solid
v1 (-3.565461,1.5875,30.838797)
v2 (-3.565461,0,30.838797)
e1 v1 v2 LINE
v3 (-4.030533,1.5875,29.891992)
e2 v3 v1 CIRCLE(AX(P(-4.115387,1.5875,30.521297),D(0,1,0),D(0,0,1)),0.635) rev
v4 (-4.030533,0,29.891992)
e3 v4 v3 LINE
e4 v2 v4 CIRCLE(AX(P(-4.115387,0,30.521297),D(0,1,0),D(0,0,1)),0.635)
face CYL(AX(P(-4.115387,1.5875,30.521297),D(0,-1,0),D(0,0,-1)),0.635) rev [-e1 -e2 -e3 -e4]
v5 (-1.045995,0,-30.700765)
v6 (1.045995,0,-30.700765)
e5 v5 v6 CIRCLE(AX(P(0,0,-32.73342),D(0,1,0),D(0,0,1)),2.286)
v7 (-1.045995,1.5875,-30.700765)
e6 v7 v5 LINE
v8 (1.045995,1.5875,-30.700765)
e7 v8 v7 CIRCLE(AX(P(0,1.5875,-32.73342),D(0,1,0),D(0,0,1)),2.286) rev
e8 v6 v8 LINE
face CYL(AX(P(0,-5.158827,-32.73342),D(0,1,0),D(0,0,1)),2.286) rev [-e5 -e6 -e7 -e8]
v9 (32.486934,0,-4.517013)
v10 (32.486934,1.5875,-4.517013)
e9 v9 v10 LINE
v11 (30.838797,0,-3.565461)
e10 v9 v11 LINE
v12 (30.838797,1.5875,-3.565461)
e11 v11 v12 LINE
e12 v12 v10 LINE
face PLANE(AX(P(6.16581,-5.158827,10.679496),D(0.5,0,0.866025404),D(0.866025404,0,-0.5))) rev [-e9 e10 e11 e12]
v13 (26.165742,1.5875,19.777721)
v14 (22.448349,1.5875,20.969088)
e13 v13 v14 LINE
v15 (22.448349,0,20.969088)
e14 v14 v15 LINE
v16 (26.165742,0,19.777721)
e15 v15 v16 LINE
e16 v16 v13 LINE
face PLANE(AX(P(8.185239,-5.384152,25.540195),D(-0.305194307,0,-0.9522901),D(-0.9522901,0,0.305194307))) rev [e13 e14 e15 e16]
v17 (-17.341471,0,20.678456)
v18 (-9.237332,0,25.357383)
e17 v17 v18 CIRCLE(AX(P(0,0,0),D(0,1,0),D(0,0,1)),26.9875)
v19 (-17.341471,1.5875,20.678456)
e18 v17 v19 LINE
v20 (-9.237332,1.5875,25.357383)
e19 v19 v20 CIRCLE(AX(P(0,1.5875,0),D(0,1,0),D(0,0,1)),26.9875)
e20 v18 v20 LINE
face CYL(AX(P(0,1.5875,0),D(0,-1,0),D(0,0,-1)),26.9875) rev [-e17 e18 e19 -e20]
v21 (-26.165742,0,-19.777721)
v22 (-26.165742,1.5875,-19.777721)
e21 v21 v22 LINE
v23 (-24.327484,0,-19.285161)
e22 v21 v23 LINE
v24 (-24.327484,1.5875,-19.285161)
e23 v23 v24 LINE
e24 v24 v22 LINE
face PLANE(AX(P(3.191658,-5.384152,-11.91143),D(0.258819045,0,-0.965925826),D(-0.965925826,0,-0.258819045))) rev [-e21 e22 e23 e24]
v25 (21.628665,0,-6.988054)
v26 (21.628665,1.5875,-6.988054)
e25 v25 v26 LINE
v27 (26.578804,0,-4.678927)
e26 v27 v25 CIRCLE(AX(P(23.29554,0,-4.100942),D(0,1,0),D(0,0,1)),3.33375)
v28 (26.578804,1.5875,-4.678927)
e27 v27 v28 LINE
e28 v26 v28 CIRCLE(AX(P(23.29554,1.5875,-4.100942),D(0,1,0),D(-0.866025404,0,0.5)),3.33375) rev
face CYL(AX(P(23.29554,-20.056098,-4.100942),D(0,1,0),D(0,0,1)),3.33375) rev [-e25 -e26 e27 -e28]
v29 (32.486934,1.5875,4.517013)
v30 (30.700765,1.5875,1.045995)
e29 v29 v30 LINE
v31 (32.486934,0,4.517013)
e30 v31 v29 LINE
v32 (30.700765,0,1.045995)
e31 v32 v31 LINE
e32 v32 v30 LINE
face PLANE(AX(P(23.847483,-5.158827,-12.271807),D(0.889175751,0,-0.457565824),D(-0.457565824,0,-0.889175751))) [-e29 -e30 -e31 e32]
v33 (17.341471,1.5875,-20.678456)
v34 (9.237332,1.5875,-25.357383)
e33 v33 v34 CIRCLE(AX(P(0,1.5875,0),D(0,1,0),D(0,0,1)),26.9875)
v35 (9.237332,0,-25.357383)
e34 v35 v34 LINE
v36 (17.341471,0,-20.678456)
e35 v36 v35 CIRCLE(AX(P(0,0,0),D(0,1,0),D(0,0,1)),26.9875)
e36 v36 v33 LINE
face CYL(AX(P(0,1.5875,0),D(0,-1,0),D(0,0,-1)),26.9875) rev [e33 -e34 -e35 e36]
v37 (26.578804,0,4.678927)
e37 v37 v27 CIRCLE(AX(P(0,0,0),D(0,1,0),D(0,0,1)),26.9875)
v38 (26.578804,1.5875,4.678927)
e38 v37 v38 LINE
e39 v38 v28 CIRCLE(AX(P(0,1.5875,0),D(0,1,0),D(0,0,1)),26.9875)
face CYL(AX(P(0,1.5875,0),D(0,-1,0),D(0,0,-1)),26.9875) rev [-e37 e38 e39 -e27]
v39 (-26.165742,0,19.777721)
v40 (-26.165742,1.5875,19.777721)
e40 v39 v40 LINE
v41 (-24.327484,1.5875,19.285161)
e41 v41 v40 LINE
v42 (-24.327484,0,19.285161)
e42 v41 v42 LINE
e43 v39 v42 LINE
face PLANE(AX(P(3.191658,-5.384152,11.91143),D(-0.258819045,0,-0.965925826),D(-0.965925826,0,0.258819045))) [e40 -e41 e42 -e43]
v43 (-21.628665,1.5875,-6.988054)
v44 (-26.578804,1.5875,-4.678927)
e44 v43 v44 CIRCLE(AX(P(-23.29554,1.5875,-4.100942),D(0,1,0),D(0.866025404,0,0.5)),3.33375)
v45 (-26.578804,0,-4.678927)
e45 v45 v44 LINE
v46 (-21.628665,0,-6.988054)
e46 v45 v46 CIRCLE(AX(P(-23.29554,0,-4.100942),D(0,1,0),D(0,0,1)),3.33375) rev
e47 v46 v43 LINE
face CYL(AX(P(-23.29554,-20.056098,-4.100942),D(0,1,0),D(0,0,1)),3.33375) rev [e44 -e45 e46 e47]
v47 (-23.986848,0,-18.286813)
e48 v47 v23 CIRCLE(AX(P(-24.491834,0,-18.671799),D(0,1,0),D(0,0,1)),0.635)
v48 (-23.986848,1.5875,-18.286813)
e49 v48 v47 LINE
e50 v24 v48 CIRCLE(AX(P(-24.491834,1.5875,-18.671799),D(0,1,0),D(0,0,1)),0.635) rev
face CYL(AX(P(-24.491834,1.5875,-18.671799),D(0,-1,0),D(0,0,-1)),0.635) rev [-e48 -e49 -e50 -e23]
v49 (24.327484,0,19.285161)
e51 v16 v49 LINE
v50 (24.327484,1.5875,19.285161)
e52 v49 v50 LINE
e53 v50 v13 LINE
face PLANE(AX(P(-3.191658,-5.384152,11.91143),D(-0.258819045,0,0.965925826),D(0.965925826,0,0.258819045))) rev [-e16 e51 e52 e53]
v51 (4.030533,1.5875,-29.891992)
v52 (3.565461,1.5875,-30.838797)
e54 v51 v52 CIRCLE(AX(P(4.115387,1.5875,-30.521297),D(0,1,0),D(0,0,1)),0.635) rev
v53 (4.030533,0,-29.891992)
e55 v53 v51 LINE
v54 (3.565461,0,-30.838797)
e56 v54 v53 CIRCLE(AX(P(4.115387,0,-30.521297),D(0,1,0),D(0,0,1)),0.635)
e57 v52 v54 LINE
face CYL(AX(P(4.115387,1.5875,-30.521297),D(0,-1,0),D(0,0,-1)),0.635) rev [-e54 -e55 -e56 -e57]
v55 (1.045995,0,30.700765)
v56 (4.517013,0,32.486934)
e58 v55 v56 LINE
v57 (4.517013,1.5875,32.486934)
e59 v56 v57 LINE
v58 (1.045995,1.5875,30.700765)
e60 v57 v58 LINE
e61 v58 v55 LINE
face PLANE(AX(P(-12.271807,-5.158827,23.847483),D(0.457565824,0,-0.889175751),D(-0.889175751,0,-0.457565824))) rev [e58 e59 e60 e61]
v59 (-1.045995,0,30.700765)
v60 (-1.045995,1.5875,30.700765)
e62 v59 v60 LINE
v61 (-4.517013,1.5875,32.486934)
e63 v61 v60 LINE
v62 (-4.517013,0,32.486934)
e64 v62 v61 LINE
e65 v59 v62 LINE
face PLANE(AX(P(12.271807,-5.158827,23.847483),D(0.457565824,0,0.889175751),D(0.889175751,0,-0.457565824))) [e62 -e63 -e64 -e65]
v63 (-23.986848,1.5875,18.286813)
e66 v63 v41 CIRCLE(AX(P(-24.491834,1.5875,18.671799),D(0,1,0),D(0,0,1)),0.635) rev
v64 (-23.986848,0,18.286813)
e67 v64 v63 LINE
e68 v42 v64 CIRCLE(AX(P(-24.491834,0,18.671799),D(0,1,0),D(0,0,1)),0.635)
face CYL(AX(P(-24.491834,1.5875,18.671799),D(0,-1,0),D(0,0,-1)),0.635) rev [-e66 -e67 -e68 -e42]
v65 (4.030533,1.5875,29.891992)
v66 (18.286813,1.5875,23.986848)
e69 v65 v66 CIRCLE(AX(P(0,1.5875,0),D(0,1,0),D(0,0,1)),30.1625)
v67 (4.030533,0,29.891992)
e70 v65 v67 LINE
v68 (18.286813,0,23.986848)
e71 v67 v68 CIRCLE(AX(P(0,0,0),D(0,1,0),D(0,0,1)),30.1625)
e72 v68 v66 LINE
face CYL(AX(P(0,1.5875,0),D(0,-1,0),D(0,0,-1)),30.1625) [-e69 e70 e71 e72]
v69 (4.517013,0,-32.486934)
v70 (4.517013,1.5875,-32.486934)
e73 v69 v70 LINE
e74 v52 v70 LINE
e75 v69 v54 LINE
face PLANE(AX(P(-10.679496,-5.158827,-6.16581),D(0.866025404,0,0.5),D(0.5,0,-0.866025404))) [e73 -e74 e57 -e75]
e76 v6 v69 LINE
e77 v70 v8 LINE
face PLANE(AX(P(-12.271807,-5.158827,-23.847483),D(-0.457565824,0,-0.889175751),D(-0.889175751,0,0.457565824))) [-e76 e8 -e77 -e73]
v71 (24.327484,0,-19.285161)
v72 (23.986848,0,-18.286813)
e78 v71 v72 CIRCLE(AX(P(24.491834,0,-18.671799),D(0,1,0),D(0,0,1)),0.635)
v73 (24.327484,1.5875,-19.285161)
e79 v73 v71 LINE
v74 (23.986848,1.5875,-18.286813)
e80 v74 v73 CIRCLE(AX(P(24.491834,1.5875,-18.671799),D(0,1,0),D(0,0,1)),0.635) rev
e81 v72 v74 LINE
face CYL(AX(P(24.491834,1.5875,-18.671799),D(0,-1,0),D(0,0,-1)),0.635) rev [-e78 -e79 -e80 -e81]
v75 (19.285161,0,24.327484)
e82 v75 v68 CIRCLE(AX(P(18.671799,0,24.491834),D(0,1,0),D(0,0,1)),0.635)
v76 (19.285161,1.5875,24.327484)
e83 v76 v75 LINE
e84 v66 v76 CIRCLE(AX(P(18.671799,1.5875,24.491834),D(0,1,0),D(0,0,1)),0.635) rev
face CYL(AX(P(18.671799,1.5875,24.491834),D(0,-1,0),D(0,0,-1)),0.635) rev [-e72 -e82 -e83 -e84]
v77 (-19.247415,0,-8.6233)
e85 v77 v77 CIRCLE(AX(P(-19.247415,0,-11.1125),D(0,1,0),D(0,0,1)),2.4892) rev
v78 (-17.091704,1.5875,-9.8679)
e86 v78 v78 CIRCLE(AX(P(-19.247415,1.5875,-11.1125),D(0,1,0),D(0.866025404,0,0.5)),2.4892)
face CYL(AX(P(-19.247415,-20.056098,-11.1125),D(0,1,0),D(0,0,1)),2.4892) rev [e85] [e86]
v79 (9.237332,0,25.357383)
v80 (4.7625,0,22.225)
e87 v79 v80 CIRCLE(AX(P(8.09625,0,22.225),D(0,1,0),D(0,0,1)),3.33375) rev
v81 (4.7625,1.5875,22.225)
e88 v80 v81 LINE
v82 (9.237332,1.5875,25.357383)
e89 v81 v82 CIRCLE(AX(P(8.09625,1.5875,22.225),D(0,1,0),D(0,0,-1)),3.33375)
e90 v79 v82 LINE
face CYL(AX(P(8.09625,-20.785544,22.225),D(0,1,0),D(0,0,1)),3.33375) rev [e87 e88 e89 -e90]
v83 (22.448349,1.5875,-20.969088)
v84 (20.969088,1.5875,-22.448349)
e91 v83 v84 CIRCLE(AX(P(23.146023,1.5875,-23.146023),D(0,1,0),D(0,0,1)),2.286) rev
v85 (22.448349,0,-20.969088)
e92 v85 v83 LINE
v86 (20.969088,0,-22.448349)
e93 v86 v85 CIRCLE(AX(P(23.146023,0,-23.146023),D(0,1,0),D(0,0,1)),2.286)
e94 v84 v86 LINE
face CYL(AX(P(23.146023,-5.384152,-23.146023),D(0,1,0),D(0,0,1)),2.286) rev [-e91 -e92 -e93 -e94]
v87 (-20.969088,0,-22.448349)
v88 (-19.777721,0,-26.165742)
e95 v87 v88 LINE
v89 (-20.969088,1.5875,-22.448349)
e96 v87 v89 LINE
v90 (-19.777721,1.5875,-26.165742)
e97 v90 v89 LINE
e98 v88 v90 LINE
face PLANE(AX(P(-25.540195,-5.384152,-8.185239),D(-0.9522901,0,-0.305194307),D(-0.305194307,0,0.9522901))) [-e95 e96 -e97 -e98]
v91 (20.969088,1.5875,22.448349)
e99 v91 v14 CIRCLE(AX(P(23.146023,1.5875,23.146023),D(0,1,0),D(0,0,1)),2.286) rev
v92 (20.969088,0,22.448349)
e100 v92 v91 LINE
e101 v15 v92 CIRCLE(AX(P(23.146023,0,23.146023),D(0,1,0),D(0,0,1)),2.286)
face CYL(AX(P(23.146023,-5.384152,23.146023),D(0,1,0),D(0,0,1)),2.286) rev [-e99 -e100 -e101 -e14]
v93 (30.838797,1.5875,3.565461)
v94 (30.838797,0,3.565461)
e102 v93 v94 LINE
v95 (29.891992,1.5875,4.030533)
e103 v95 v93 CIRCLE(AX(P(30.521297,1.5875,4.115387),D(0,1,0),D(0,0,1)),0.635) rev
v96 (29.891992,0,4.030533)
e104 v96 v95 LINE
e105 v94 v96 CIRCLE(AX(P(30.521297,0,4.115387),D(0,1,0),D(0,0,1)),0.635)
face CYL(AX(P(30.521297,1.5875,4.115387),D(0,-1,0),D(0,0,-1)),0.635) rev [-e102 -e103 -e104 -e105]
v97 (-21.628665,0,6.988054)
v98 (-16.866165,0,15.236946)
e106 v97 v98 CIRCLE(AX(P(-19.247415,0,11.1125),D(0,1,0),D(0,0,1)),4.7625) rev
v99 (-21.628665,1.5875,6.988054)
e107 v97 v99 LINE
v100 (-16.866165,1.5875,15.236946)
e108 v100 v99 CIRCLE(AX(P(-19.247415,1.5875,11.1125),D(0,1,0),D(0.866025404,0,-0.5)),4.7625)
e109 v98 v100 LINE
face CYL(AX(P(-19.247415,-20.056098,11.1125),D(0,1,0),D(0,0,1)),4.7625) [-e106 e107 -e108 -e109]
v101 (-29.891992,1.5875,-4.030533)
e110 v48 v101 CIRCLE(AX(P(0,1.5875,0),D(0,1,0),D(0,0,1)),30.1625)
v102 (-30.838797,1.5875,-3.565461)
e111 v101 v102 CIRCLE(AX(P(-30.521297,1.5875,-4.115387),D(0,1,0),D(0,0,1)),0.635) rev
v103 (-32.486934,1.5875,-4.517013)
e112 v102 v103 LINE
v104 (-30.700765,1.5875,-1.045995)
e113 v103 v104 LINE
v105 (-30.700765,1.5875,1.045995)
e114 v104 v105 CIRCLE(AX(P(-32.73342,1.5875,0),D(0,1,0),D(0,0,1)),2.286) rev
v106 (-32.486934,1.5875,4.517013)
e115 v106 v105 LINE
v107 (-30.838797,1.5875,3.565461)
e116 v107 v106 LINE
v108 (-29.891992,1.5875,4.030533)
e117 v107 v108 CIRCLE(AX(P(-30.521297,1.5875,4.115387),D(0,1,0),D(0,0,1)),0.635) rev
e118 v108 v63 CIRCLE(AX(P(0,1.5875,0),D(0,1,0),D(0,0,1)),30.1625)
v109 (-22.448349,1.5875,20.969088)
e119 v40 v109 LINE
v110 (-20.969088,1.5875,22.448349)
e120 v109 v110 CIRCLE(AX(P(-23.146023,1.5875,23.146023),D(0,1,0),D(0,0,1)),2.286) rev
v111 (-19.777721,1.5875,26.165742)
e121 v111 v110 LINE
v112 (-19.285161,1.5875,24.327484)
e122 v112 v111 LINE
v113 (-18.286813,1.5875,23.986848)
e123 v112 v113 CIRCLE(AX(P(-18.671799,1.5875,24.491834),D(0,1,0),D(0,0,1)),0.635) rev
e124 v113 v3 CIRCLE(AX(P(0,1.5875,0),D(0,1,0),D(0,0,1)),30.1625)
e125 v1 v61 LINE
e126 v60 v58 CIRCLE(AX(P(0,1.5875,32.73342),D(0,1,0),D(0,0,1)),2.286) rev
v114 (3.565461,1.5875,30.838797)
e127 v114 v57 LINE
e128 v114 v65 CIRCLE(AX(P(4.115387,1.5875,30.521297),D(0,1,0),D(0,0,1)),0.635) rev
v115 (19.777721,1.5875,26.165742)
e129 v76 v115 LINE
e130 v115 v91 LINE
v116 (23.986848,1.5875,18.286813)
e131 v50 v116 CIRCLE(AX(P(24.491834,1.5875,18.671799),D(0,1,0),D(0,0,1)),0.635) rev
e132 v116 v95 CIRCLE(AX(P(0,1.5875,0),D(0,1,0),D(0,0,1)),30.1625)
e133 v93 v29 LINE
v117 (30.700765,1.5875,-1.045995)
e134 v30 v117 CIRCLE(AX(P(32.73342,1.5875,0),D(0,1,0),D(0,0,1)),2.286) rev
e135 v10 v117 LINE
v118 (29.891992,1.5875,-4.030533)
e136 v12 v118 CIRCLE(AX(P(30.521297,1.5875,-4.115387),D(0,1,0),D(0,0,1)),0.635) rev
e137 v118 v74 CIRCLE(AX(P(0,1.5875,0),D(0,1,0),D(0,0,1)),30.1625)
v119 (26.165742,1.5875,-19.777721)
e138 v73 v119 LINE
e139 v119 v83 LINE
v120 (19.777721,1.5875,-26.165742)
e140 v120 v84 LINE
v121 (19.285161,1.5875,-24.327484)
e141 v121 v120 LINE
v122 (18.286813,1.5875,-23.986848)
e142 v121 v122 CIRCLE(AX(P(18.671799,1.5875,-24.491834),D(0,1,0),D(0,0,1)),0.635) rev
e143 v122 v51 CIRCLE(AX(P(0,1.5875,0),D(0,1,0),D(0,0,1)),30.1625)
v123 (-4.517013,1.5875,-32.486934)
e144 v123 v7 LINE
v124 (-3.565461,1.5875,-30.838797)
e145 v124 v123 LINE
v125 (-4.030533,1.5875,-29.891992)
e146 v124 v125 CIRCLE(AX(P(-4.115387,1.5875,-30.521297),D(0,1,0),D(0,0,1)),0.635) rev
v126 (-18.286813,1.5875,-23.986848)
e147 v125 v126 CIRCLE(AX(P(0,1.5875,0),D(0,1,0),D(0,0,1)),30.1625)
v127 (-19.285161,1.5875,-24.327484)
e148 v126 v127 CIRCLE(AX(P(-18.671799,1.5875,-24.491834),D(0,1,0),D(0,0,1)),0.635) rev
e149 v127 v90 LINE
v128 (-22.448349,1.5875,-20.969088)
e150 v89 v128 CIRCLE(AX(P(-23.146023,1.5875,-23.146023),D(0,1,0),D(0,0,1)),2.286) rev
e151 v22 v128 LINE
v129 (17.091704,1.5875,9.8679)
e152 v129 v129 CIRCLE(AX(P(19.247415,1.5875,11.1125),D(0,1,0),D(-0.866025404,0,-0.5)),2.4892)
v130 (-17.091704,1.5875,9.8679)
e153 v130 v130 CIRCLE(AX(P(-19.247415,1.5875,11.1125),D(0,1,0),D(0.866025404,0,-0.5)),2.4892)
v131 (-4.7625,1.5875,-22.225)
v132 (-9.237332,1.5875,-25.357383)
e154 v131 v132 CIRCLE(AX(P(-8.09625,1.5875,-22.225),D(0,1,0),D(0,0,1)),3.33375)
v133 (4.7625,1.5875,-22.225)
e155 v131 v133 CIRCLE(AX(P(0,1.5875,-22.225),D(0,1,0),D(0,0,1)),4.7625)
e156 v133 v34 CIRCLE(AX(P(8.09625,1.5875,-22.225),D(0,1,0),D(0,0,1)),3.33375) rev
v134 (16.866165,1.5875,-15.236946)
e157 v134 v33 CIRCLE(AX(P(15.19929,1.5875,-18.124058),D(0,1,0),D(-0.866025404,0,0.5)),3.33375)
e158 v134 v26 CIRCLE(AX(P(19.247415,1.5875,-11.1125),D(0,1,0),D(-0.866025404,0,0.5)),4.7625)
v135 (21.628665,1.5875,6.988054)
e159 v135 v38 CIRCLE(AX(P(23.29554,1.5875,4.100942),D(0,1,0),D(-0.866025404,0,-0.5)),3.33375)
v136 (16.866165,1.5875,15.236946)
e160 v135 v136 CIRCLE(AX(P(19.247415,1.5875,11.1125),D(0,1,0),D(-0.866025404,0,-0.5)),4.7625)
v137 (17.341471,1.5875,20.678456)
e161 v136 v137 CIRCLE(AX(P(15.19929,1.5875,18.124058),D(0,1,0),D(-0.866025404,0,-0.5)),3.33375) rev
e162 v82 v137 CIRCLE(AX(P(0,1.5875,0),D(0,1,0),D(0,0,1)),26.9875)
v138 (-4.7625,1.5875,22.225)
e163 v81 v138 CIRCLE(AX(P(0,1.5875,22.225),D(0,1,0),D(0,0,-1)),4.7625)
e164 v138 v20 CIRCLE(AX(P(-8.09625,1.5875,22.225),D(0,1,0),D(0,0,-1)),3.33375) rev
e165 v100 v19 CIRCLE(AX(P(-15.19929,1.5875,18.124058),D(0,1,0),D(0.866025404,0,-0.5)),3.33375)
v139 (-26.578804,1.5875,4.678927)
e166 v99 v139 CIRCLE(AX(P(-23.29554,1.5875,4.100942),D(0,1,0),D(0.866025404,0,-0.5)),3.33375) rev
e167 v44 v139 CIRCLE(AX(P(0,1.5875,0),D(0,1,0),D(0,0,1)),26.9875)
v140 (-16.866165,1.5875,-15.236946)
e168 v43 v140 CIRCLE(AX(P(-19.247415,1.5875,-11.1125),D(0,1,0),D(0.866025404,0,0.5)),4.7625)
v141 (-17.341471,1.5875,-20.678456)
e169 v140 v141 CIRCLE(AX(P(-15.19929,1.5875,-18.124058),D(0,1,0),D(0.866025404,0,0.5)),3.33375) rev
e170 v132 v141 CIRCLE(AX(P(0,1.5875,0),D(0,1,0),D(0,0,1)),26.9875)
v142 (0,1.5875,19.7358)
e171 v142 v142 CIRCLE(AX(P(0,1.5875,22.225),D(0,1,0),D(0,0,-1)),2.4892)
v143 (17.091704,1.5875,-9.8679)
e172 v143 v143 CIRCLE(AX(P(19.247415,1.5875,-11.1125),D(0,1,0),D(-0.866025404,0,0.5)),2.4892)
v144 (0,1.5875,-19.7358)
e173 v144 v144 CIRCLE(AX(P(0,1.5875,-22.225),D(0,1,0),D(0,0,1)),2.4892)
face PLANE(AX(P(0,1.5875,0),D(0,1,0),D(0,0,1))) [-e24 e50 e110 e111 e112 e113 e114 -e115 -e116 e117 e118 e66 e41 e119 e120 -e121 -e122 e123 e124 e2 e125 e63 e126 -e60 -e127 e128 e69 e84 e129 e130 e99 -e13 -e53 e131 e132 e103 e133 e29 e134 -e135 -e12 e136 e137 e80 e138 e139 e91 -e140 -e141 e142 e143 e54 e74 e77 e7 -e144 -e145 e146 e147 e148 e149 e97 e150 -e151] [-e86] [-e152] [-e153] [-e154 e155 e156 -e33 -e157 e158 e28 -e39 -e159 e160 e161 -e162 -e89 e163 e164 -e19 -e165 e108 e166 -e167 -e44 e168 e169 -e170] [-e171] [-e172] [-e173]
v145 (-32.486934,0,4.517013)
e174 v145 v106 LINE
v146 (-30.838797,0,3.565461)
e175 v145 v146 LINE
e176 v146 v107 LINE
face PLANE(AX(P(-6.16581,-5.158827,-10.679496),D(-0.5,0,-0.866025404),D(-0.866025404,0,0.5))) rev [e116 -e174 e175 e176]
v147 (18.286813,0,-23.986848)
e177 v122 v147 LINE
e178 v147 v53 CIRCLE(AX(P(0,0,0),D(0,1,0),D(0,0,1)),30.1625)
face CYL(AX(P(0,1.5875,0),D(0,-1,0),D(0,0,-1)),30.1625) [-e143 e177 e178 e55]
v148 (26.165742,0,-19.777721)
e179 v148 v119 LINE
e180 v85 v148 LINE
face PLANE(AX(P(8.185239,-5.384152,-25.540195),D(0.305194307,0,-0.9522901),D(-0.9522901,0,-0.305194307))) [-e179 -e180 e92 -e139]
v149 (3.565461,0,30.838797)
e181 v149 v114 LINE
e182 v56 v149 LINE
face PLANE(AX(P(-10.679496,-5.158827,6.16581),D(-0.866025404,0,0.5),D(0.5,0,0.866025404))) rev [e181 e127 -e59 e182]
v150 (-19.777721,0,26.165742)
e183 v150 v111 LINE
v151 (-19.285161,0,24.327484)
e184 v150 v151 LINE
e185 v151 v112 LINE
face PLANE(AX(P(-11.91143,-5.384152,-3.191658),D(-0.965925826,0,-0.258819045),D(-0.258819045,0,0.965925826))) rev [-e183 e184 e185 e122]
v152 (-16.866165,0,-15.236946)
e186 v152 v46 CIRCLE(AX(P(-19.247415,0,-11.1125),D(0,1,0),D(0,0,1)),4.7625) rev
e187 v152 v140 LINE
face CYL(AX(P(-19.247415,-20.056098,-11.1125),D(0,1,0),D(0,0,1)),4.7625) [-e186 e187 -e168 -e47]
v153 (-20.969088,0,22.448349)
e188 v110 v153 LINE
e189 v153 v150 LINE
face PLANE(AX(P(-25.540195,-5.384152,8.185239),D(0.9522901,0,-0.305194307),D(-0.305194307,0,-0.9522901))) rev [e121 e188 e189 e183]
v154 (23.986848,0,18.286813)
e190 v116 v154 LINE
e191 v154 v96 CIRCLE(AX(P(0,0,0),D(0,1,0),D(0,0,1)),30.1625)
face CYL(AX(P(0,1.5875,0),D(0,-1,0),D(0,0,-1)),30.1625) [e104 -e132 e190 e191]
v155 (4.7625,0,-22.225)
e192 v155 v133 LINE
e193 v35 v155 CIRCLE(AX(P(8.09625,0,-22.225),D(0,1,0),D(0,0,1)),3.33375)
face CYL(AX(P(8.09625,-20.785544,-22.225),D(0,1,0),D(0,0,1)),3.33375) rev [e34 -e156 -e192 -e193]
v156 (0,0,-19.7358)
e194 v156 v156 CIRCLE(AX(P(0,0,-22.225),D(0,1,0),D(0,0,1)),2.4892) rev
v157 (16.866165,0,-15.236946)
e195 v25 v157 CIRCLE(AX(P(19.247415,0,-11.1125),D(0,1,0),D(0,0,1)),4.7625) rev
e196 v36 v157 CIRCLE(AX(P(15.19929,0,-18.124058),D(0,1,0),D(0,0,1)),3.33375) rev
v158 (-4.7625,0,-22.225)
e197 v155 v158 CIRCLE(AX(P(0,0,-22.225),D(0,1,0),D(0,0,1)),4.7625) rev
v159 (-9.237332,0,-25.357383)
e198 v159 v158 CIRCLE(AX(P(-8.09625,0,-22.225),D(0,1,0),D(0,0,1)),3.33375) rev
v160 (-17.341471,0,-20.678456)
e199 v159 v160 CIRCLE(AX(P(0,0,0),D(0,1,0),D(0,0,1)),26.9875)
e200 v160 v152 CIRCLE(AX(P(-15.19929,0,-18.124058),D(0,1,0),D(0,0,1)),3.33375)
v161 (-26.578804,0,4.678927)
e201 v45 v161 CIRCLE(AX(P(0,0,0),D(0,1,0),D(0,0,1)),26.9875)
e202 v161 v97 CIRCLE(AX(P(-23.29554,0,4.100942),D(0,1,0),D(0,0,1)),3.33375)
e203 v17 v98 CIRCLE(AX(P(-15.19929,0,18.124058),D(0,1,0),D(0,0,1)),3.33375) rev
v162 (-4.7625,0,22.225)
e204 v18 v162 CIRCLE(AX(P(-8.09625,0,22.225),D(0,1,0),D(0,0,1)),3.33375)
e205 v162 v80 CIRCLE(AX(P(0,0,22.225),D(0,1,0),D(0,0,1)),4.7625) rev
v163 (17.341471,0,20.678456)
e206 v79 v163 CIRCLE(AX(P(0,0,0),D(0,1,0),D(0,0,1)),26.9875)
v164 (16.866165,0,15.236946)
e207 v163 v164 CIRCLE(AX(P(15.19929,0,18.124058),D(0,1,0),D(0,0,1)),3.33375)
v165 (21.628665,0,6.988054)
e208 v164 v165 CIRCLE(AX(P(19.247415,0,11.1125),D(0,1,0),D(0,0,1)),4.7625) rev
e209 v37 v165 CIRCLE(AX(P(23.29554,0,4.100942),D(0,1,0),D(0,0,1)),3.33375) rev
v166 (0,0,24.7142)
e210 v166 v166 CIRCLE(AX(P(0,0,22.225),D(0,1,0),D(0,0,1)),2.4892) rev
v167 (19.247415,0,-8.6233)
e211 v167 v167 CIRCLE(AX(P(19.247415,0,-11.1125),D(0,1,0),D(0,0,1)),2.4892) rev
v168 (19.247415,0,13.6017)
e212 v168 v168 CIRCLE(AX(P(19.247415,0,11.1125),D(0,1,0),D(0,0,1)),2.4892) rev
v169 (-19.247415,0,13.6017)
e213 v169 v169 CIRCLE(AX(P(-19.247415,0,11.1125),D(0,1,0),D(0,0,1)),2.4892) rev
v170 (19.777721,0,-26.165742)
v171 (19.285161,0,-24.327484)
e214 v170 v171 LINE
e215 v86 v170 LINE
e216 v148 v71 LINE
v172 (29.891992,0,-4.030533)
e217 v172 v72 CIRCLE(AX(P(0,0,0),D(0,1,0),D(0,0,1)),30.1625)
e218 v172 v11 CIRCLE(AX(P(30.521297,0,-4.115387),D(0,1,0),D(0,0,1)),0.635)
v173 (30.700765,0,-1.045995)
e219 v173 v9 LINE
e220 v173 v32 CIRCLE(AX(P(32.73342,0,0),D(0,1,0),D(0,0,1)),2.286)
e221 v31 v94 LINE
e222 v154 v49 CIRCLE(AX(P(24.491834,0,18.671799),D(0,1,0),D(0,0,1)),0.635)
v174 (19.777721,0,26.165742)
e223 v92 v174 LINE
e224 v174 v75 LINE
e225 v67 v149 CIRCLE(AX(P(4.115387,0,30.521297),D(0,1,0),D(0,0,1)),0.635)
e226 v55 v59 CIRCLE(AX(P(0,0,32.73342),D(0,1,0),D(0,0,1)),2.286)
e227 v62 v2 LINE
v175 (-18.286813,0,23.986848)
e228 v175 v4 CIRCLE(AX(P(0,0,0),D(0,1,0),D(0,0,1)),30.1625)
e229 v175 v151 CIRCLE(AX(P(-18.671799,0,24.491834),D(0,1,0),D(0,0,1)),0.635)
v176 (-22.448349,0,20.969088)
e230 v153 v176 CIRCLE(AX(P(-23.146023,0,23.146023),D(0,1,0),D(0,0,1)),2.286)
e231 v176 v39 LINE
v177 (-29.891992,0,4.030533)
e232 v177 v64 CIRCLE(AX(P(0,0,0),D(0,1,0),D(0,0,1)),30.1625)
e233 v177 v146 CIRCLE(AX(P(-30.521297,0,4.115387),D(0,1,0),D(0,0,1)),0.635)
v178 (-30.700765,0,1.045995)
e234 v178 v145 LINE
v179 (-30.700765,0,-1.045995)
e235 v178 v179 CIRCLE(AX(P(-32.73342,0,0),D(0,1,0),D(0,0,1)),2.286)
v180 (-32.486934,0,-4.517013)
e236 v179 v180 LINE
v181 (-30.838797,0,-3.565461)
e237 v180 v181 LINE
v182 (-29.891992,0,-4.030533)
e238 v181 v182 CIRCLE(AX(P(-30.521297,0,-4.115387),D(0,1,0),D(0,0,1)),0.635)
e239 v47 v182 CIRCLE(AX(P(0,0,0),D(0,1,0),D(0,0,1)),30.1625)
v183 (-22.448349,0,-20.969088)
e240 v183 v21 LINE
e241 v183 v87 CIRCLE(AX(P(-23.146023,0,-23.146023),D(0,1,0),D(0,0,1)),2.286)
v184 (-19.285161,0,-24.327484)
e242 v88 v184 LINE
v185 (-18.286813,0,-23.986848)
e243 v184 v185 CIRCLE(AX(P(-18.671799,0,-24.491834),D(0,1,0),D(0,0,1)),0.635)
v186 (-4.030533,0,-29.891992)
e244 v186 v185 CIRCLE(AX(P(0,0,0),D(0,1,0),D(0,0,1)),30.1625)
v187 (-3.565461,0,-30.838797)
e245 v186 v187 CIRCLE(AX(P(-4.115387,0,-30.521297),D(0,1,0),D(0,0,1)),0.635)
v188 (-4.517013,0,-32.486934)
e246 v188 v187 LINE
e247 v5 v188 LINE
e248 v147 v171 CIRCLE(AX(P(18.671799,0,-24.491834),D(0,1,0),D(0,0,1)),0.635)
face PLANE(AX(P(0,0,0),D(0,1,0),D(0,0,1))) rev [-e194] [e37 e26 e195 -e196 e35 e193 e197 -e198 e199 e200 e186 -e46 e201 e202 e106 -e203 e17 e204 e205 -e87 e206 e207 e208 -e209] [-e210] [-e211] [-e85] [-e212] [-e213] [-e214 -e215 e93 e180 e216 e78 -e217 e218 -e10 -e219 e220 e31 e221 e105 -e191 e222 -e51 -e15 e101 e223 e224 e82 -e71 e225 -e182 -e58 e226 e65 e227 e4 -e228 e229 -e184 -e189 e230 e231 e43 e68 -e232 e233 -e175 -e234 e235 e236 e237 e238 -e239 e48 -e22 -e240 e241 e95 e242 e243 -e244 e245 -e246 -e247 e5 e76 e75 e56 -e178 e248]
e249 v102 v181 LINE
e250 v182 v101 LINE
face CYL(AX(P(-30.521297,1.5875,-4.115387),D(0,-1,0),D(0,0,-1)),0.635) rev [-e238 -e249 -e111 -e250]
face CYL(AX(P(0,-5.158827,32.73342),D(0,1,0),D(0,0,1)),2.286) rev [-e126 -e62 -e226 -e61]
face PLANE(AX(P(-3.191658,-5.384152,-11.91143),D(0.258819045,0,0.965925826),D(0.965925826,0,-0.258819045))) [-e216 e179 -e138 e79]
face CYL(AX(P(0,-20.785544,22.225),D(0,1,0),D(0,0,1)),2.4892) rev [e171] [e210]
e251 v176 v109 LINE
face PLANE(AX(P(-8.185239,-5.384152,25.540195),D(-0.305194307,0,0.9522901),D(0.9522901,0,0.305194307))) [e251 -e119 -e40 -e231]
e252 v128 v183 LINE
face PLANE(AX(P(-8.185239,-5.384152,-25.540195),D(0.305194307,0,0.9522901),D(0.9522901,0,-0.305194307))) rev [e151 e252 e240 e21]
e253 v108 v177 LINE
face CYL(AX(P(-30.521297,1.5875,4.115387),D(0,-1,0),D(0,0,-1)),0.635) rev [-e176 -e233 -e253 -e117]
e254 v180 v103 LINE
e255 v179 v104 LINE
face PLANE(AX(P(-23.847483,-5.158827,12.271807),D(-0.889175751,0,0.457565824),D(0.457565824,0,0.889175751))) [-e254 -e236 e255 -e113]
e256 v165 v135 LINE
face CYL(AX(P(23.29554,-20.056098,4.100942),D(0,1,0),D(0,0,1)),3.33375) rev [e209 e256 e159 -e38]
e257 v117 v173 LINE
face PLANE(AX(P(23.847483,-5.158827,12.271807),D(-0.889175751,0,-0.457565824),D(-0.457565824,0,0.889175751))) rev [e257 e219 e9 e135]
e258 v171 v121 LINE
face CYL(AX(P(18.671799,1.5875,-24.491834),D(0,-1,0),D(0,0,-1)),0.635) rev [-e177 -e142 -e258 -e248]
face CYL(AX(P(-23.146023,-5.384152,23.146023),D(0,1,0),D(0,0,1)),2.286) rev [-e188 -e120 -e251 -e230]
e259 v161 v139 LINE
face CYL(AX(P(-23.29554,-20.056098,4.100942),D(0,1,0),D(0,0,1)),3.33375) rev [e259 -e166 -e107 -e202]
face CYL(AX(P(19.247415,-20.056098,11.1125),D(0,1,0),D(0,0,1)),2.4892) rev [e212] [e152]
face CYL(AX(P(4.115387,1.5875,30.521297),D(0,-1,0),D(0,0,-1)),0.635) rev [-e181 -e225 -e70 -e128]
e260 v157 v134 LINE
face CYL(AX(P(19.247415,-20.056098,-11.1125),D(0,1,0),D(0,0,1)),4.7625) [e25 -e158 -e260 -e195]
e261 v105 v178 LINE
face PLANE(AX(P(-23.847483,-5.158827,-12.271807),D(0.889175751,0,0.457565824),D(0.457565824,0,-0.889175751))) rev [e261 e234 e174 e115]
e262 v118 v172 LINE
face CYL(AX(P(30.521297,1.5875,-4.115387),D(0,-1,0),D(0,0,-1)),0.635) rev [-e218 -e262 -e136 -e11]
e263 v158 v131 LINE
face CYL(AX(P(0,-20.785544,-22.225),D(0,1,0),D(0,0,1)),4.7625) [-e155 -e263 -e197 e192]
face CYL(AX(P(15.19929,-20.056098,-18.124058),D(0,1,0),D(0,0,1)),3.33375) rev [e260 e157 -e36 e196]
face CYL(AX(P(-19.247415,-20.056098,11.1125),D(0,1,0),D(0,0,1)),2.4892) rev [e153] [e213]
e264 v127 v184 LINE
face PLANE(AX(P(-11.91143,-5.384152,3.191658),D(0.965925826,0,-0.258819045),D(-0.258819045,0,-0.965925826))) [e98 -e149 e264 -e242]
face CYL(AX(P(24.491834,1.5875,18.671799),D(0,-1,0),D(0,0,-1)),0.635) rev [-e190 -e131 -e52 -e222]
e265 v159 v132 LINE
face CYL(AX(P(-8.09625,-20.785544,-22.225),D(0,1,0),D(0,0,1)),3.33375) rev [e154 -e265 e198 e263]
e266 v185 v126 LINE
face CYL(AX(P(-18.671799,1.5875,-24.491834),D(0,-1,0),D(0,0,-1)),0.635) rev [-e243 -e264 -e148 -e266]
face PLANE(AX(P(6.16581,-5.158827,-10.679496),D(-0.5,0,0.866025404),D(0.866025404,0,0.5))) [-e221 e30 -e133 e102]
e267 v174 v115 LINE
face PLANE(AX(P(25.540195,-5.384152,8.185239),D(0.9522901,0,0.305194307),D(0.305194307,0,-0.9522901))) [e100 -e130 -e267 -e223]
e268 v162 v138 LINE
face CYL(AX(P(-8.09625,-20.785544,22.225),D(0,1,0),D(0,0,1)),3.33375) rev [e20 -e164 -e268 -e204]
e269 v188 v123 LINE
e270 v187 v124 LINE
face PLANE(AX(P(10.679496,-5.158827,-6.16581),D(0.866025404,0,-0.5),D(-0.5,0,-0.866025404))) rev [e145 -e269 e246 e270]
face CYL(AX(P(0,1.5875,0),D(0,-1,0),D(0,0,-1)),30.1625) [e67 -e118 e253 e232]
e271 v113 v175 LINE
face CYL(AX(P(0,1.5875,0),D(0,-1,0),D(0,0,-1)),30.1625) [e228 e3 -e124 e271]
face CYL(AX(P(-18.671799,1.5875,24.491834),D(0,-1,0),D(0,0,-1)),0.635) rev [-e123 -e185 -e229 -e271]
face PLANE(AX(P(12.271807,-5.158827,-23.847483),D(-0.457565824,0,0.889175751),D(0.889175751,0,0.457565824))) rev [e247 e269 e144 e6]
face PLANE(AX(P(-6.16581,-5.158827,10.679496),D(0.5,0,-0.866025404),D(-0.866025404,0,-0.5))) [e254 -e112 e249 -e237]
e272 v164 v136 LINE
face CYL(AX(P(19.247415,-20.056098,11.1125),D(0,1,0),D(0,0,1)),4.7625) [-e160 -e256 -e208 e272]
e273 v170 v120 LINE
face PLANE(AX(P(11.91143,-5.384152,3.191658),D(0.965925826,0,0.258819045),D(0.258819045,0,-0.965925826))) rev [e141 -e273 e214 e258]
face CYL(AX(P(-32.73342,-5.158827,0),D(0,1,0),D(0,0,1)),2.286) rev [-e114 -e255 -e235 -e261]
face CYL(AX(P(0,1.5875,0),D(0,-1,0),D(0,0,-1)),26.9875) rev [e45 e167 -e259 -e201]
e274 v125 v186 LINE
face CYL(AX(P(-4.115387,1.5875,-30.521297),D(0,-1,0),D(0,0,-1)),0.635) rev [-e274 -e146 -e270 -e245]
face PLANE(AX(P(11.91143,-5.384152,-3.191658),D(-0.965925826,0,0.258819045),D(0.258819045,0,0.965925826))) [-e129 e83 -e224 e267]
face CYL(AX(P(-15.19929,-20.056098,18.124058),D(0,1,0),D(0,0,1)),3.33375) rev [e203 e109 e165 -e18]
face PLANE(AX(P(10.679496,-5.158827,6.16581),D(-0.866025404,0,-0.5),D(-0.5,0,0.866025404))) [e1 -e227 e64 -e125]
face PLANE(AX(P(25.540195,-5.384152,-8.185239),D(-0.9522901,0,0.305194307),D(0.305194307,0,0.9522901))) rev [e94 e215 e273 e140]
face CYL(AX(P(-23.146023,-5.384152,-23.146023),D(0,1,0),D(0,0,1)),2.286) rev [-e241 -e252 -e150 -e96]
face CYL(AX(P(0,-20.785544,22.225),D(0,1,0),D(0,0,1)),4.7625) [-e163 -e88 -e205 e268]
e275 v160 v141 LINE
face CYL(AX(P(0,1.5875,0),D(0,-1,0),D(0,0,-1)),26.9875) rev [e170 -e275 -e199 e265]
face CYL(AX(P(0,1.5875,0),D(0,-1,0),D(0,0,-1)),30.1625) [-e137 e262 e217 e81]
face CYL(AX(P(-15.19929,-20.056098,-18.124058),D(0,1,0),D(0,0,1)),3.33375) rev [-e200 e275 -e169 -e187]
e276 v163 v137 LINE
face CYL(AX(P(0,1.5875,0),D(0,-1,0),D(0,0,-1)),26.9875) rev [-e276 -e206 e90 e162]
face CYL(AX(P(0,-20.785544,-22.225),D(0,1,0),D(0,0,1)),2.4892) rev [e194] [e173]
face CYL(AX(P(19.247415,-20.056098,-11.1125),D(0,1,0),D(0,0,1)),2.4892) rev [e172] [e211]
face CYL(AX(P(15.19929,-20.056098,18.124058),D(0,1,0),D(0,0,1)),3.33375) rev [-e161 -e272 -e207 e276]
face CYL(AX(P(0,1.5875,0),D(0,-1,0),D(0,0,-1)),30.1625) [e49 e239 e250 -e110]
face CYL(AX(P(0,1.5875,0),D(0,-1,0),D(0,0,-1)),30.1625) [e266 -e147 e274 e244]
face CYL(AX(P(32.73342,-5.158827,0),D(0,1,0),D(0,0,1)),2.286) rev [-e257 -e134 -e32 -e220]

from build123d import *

# Parameters (mm, degrees)
SKETCH1_R                = 30.1625
SKETCH1_R_2              = 26.9875
BOSS_EXTRUDE1_DEPTH      = 1.5875
BOSS_EXTRUDE2_START      = -1.5875
SKETCH2_R                = 2.4892
BOSS_EXTRUDE2_DEPTH      = 1.5875
CIRPATTERN1_COUNT        = 6
BOSS_EXTRUDE3_START      = -1.5875
BOSS_EXTRUDE3_DEPTH      = 1.5875
FILLET1_R                = 2.286
FILLET2_R                = 1.524
FILLET3_R                = 0.635
CIRPATTERN2_COUNT        = 8
FILLET1_OF_CIRPATTERN2_R = 2.286
FILLET2_OF_CIRPATTERN2_R = 1.524
FILLET3_OF_CIRPATTERN2_R = 0.635


with BuildPart() as part:
    # Sketch1 → Boss-Extrude1 (new body)
    with BuildSketch(Plane(origin=(0, 0, 0), x_dir=(1, 0, 0), z_dir=(0, 1, 0))):
        with Locations(Location((0, 0, 0), (0, 0, 270))):
            Circle(SKETCH1_R)
        with Locations(Location((0, 0, 0), (0, 0, 270))):
            Circle(SKETCH1_R_2, mode=Mode.SUBTRACT)
    extrude(amount=BOSS_EXTRUDE1_DEPTH)

    # Sketch2 → Boss-Extrude2 (add)
    with BuildSketch(Plane(origin=(0, 1.5875, 0), x_dir=(1, 0, 0), z_dir=(0, 1, 0)).offset(BOSS_EXTRUDE2_START)):
        with BuildLine():
            ThreePointArc((-9.237332215, 25.35738255), (-6.184469909, 24.956114415), (-4.7625, 22.225))
            ThreePointArc((-4.7625, 22.225), (0, 17.4625), (4.7625, 22.225))
            ThreePointArc((4.7625, 22.225), (6.184469909, 24.956114415), (9.237332215, 25.35738255))
            ThreePointArc((9.237332215, 25.35738255), (0, 26.9875), (-9.237332215, 25.35738255))
        make_face()
        with Locations(Location((0, 22.225, 0), (0, 0, 270))):
            Circle(SKETCH2_R, mode=Mode.SUBTRACT)
    boss_extrude2 = extrude(amount=BOSS_EXTRUDE2_DEPTH)

    # CirPattern1: Boss-Extrude2 ×6 about axis
    cirpattern1_axis = Axis((0, 0, 0), (0, 1, 0))
    for i in range(1, CIRPATTERN1_COUNT):
        add(boss_extrude2.rotate(cirpattern1_axis, i * 360 / CIRPATTERN1_COUNT))

    # Sketch3 → Boss-Extrude3 (add)
    with BuildSketch(Plane(origin=(0, 1.5875, 0), x_dir=(1, 0, 0), z_dir=(0, 1, 0)).offset(BOSS_EXTRUDE3_START)):
        with BuildLine():
            Line((4.517012817, 32.486934384), (0, 30.1625))
            ThreePointArc((0, 30.1625), (1.589709482, 30.120578182), (3.175, 29.994929259))
            ThreePointArc((3.175, 29.994929259), (3.206558857, 30.078714629), (3.175, 30.1625))
            Line((3.175, 30.1625), (4.517012817, 32.486934384))
        make_face()
        with BuildLine():
            Line((-4.517012817, 32.486934384), (-3.175, 30.1625))
            ThreePointArc((-3.175, 30.1625), (-3.206558857, 30.078714629), (-3.175, 29.994929259))
            ThreePointArc((-3.175, 29.994929259), (-1.589709482, 30.120578182), (0, 30.1625))
            Line((0, 30.1625), (-4.517012817, 32.486934384))
        make_face()
    boss_extrude3 = extrude(amount=BOSS_EXTRUDE3_DEPTH)

    # Fillet1
    fillet1_edges = [part.edges().sort_by_distance(p)[0] for p in [
        (0, 0.79375, -30.1625),
    ]]
    fillet(fillet1_edges, radius=FILLET1_R)

    # Fillet2
    # the kernel refuses this fillet: 1.524 mm, written as the material it adds along each edge
    with BuildSketch(Plane(origin=(3.175, 0, -29.994929259), x_dir=(0, 0, -1), z_dir=(0, 1, 0))) as fillet2_piece_1:
        with BuildLine():
            CenterArc((1.435454488, -0.845604401), FILLET2_R, 146.299028695, 26.411231524)
            Line((-0.076227295, -0.652228639), (-0.106460931, -0.648361123))
            ThreePointArc((-0.106460931, -0.648361123), (-0.06661258, -0.322783591), (-0.030310665, 0.003208421))
            Line((-0.030310665, 0.003208421), (0.020108489, 0.022905874))
            ThreePointArc((0.020108489, 0.022905874), (0.083785371, -0.001078857), (0.142213066, 0.016912088))
            Line((0.142213066, 0.016912088), (0.167570741, 0))
        make_face()
    extrude(amount=1.5875)
    with BuildSketch(Plane(origin=(-3.175, 0, -29.994929259), x_dir=(-0.9932396393904435, 0, 0.11608194839656201), z_dir=(0, 1, 0))) as fillet2_piece_2:
        with BuildLine():
            CenterArc((0.673257457, -1.523909705), FILLET2_R, 90.623705681, 26.411231524)
            Line((-0.019451938, -0.166437902), (-0.033306126, -0.139288466))
            ThreePointArc((-0.033306126, -0.139288466), (-0.008654405, -0.083344187), (-0.025085255, -0.01731359))
            Line((-0.025085255, -0.01731359), (0.00033179, 0.030478194))
            ThreePointArc((0.00033179, 0.030478194), (0.328333975, 0.028692907), (0.656336161, 0.030478194))
            Line((0.656336161, 0.030478194), (0.656667951, 0))
        make_face()
    extrude(amount=1.5875)

    # Fillet3
    fillet3_edges = [part.edges().sort_by_distance(p)[0] for p in [
        (-3.175, 0.79375, -30.1625),
        (3.175, 0.79375, -30.1625),
    ]]
    fillet(fillet3_edges, radius=FILLET3_R)

    # CirPattern2: Boss-Extrude3 ×8 about axis
    cirpattern2_axis = Axis((0, 0, 0), (0, 1, 0))
    for i in range(1, CIRPATTERN2_COUNT):
        add(boss_extrude3.rotate(cirpattern2_axis, i * 360 / CIRPATTERN2_COUNT))

    # Fillet1 of CirPattern2
    fillet1_of_cirpattern2_edges = [part.edges().sort_by_distance(p)[0] for p in [
        (-21.328108288, 0.79375, -21.328108288),
        (-30.1625, 0.79375, 0),
        (-21.328108288, 0.79375, 21.328108288),
        (0, 0.79375, 30.1625),
        (21.328108288, 0.79375, 21.328108288),
        (30.1625, 0.79375, 0),
        (21.328108288, 0.79375, -21.328108288),
    ]]
    fillet(fillet1_of_cirpattern2_edges, radius=FILLET1_OF_CIRPATTERN2_R)

    # Fillet2 of CirPattern2
    # the kernel refuses this fillet: 1.524 mm, written as the material it adds along each edge
    with BuildSketch(Plane(origin=(-18.96455385, 0, -23.45468191), x_dir=(0.7844088172408243, 0, -0.6202441514717015), z_dir=(0, 1, 0)), Plane(origin=(-29.994929259, 0, -3.175), x_dir=(0.11608194839659203, 0, -0.9932396393904398), z_dir=(0, 1, 0)), Plane(origin=(-23.45468191, 0, 18.96455385), x_dir=(-0.620244151471689, 0, -0.7844088172408342), z_dir=(0, 1, 0))) as fillet2_of_cirpattern2_piece_1:
        with BuildLine():
            CenterArc((0.673257457, 1.523909705), FILLET2_OF_CIRPATTERN2_R, 242.965062795, 26.411231524)
            Line((-0.019451938, 0.166437902), (-0.033306126, 0.139288466))
            ThreePointArc((-0.033306126, 0.139288466), (-0.008654405, 0.083344187), (-0.025085255, 0.01731359))
            Line((-0.025085255, 0.01731359), (0.00033179, -0.030478194))
            ThreePointArc((0.00033179, -0.030478194), (0.328333975, -0.028692907), (0.656336161, -0.030478194))
            Line((0.656336161, -0.030478194), (0.656667951, 0))
        make_face()
    extrude(amount=1.5875)
    with BuildSketch(Plane(origin=(-23.45468191, 0, -18.96455385), x_dir=(-0.7071067811865793, 0, -0.7071067811865157), z_dir=(0, 1, 0)), Plane(origin=(-29.994929259, 0, 3.175), x_dir=(-1, 0, 0), z_dir=(0, 1, 0)), Plane(origin=(18.96455385, 0, -23.45468191), x_dir=(0.7071067811865369, 0, -0.7071067811865581), z_dir=(0, 1, 0))) as fillet2_of_cirpattern2_piece_2:
        with BuildLine():
            CenterArc((1.435454488, 0.845604401), FILLET2_OF_CIRPATTERN2_R, 187.289739781, 26.411231524)
            Line((-0.076227295, 0.652228639), (-0.106460931, 0.648361123))
            ThreePointArc((-0.106460931, 0.648361123), (-0.06661258, 0.322783591), (-0.030310665, -0.003208421))
            Line((-0.030310665, -0.003208421), (0.020108489, -0.022905874))
            ThreePointArc((0.020108489, -0.022905874), (0.083785371, 0.001078857), (0.142213066, -0.016912088))
            Line((0.142213066, -0.016912088), (0.167570741, 0))
        make_face()
    extrude(amount=1.5875)
    with BuildSketch(Plane(origin=(-18.96455385, 0, 23.45468191), x_dir=(0.784408817240829, 0, 0.6202441514716955), z_dir=(0, 1, 0)), Plane(origin=(3.175, 0, 29.994929259), x_dir=(0.9932396393904444, 0, -0.11608194839655256), z_dir=(0, 1, 0)), Plane(origin=(23.45468191, 0, 18.96455385), x_dir=(0.6202441514717251, 0, -0.7844088172408058), z_dir=(0, 1, 0)), Plane(origin=(29.994929259, 0, -3.175), x_dir=(-0.1160819483965305, 0, -0.9932396393904471), z_dir=(0, 1, 0))) as fillet2_of_cirpattern2_piece_3:
        with BuildLine():
            CenterArc((0.673257457, -1.523909705), FILLET2_OF_CIRPATTERN2_R, 90.623705681, 26.411231524)
            Line((-0.019451938, -0.166437902), (-0.033306126, -0.139288466))
            ThreePointArc((-0.033306126, -0.139288466), (-0.008654405, -0.083344187), (-0.025085255, -0.01731359))
            Line((-0.025085255, -0.01731359), (0.00033179, 0.030478194))
            ThreePointArc((0.00033179, 0.030478194), (0.328333975, 0.028692907), (0.656336161, 0.030478194))
            Line((0.656336161, 0.030478194), (0.656667951, 0))
        make_face()
    extrude(amount=1.5875)
    with BuildSketch(Plane(origin=(-3.175, 0, 29.994929259), x_dir=(0, 0, 1), z_dir=(0, 1, 0)), Plane(origin=(18.96455385, 0, 23.45468191), x_dir=(0.7071067811865263, 0, 0.7071067811865687), z_dir=(0, 1, 0)), Plane(origin=(29.994929259, 0, 3.175), x_dir=(1, 0, 0), z_dir=(0, 1, 0)), Plane(origin=(23.45468191, 0, -18.96455385), x_dir=(0.7071067811865581, 0, -0.7071067811865369), z_dir=(0, 1, 0))) as fillet2_of_cirpattern2_piece_4:
        with BuildLine():
            CenterArc((1.435454488, -0.845604401), FILLET2_OF_CIRPATTERN2_R, 146.299028695, 26.411231524)
            Line((-0.076227295, -0.652228639), (-0.106460931, -0.648361123))
            ThreePointArc((-0.106460931, -0.648361123), (-0.06661258, -0.322783591), (-0.030310665, 0.003208421))
            Line((-0.030310665, 0.003208421), (0.020108489, 0.022905874))
            ThreePointArc((0.020108489, 0.022905874), (0.083785371, -0.001078857), (0.142213066, 0.016912088))
            Line((0.142213066, 0.016912088), (0.167570741, 0))
        make_face()
    extrude(amount=1.5875)

    # Fillet3 of CirPattern2
    fillet3_of_cirpattern2_edges = [part.edges().sort_by_distance(p)[0] for p in [
        (-23.573172318, 0.79375, -19.083044257),
        (-19.083044257, 0.79375, -23.573172318),
        (-30.1625, 0.79375, 3.175),
        (-30.1625, 0.79375, -3.175),
        (-19.083044257, 0.79375, 23.573172318),
        (-23.573172318, 0.79375, 19.083044257),
        (3.175, 0.79375, 30.1625),
        (-3.175, 0.79375, 30.1625),
        (23.573172318, 0.79375, 19.083044257),
        (19.083044257, 0.79375, 23.573172318),
        (30.1625, 0.79375, -3.175),
        (30.1625, 0.79375, 3.175),
        (19.083044257, 0.79375, -23.573172318),
        (23.573172318, 0.79375, -19.083044257),
    ]]
    fillet(fillet3_of_cirpattern2_edges, radius=FILLET3_OF_CIRPATTERN2_R)


solid = part.part
